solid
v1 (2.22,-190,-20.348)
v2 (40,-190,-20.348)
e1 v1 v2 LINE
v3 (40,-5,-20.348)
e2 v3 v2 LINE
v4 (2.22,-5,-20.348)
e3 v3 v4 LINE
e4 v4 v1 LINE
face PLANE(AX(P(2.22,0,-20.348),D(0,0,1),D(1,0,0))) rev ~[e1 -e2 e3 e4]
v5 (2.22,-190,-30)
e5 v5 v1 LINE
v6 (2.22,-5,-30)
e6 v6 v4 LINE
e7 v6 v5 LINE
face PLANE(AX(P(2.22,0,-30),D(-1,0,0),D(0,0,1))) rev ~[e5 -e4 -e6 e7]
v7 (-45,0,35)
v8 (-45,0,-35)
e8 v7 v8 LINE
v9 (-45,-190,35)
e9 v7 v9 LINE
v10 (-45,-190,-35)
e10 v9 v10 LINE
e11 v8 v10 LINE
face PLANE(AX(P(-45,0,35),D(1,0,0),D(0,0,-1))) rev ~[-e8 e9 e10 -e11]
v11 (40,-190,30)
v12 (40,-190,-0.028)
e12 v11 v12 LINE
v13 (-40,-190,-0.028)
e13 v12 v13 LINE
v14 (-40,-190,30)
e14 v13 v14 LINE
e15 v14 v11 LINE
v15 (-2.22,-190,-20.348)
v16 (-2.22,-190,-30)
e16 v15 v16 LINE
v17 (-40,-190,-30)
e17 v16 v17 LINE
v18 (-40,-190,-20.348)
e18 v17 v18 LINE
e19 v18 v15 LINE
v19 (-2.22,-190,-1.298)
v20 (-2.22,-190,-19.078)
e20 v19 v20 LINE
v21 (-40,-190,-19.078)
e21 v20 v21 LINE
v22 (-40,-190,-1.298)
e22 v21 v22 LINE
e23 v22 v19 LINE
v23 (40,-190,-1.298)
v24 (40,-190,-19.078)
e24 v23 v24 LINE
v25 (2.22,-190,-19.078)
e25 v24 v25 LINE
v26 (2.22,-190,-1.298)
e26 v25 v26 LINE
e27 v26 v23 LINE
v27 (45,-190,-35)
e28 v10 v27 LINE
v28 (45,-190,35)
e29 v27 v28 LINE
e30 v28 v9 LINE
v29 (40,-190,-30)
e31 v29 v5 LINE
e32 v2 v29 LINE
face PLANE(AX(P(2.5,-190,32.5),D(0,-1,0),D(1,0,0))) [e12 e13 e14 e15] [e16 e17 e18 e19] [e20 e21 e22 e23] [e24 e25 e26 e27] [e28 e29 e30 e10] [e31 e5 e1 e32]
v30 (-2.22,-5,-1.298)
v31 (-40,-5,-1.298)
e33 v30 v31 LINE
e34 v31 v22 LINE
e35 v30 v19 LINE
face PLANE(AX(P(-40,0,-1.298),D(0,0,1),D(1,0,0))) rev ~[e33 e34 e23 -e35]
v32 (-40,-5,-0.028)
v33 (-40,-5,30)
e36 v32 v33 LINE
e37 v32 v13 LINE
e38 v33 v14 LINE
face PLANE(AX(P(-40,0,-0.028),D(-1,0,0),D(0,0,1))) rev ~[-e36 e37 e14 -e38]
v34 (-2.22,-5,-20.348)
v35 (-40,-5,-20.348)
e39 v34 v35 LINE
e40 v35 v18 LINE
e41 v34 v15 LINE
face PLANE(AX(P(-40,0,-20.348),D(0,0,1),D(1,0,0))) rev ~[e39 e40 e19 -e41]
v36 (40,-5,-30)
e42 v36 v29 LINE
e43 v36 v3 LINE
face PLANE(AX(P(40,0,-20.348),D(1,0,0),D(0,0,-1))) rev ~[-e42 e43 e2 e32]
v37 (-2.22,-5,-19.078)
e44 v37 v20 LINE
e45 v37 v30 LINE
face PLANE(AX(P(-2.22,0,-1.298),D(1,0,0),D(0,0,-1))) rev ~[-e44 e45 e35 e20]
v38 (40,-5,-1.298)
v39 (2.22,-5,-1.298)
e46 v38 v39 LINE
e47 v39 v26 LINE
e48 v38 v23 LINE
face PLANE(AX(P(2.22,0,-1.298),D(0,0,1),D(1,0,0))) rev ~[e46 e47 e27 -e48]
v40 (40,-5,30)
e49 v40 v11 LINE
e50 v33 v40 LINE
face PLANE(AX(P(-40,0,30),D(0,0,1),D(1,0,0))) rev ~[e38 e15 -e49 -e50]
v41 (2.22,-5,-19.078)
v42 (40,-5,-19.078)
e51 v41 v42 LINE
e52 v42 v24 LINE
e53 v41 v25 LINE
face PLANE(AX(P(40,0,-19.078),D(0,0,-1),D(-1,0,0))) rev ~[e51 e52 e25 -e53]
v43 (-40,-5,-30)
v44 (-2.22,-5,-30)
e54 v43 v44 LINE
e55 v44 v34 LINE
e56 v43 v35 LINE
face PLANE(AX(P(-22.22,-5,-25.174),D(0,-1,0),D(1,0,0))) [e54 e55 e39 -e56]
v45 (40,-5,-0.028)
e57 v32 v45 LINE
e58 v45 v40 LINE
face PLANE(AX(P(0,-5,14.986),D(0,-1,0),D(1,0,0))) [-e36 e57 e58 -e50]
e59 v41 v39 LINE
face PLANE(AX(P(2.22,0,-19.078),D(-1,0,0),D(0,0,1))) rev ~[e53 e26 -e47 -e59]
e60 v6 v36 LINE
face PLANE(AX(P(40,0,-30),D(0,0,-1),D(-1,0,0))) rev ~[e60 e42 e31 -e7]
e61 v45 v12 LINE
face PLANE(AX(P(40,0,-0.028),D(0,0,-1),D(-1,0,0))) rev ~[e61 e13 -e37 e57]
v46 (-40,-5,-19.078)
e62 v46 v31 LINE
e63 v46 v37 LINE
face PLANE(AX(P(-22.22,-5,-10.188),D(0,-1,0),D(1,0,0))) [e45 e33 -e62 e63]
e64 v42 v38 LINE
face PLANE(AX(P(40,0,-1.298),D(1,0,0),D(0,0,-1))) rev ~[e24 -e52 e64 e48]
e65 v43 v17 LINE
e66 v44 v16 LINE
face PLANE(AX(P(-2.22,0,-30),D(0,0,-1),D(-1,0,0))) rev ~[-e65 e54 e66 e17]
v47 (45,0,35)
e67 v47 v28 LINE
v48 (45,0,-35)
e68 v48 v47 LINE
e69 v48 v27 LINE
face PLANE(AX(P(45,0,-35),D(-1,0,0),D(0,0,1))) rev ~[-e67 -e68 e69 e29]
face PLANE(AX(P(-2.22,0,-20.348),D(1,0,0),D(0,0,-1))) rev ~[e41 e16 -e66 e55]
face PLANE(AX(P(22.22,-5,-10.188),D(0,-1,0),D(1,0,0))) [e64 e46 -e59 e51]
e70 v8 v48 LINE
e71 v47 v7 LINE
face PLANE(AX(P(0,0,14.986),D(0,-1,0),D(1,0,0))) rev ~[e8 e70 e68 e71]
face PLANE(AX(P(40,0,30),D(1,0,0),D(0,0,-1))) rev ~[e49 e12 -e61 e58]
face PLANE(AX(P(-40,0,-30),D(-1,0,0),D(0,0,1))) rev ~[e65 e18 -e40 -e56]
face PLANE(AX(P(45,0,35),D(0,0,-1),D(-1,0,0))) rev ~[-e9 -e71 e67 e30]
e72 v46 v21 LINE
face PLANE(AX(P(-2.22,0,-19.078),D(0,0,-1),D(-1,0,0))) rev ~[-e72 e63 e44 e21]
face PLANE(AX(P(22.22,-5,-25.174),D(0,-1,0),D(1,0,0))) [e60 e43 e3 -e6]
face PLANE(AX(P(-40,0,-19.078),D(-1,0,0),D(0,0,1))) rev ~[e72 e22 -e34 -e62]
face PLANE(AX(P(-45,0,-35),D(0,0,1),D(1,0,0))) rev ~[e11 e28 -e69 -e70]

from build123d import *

# Parameters (mm, degrees)
F1_DEPTH = 190
F0_W     = 80
F0_H     = 30.028
F0_W_2   = 35.56
F0_H_2   = 17.78
F0_H_3   = 9.652
F0_W_3   = 2.22
F2_DEPTH = 5


with BuildPart() as f1:
    # F0 (on Front) → F1 (new body)
    with BuildSketch(Plane.XZ):
        Polygon((45, 30), (45, 35), (-40, 35), (-40, 30.452), (-40, 30), (40, 30), align=None)
        Polygon((-40, 30.452), (-40, 35), (-45, 35), (-45, -30), (-40, -30), (-40, -20.348), (-40, -19.078), (-40, -1.298), (-40, -0.028), (-40, 30), align=None)
        Polygon((45, -30), (45, 30), (40, 30), (40, -0.028), (40, -1.298), (40, -19.078), (40, -20.348), (40, -30), align=None)
        Polygon((45, -35), (45, -30), (40, -30), (4.44, -30), (2.22, -30), (-2.22, -30), (-4.44, -30), (-40, -30), (-45, -30), (-45, -35), align=None)
        Polygon((40, -1.298), (40, -0.028), (-40, -0.028), (-40, -1.298), (-4.44, -1.298), (-2.22, -1.298), (2.22, -1.298), (4.44, -1.298), align=None)
        Polygon((4.44, -20.348), (40, -20.348), (40, -19.078), (4.44, -19.078), (2.22, -19.078), (2.22, -20.348), align=None)
        Polygon((-40, -19.078), (-40, -20.348), (-4.44, -20.348), (-2.22, -20.348), (-2.22, -19.078), (-4.44, -19.078), align=None)
        Polygon((-2.22, -30), (2.22, -30), (2.22, -20.348), (2.22, -19.078), (2.22, -1.298), (-2.22, -1.298), (-2.22, -19.078), (-2.22, -20.348), align=None)
    extrude(amount=F1_DEPTH)

    # F0 (on Front) → F2 (join)
    with BuildSketch(Plane.XZ):
        with Locations((0, 14.986)):
            Rectangle(F0_W, F0_H)
        with Locations((-22.22, -10.188)):
            Rectangle(F0_W_2, F0_H_2)
        with Locations((22.22, -10.188)):
            Rectangle(F0_W_2, F0_H_2)
        with Locations((22.22, -25.174)):
            Rectangle(F0_W_2, F0_H_3)
        with Locations((-22.22, -25.174)):
            Rectangle(F0_W_2, F0_H_3)
        with Locations((-3.33, -10.188)):
            Rectangle(F0_W_3, F0_H_2)
        with Locations((-3.33, -25.174)):
            Rectangle(F0_W_3, F0_H_3)
        with Locations((3.33, -25.174)):
            Rectangle(F0_W_3, F0_H_3)
        with Locations((3.33, -10.188)):
            Rectangle(F0_W_3, F0_H_2)
    extrude(amount=F2_DEPTH)


solid = f1.part
